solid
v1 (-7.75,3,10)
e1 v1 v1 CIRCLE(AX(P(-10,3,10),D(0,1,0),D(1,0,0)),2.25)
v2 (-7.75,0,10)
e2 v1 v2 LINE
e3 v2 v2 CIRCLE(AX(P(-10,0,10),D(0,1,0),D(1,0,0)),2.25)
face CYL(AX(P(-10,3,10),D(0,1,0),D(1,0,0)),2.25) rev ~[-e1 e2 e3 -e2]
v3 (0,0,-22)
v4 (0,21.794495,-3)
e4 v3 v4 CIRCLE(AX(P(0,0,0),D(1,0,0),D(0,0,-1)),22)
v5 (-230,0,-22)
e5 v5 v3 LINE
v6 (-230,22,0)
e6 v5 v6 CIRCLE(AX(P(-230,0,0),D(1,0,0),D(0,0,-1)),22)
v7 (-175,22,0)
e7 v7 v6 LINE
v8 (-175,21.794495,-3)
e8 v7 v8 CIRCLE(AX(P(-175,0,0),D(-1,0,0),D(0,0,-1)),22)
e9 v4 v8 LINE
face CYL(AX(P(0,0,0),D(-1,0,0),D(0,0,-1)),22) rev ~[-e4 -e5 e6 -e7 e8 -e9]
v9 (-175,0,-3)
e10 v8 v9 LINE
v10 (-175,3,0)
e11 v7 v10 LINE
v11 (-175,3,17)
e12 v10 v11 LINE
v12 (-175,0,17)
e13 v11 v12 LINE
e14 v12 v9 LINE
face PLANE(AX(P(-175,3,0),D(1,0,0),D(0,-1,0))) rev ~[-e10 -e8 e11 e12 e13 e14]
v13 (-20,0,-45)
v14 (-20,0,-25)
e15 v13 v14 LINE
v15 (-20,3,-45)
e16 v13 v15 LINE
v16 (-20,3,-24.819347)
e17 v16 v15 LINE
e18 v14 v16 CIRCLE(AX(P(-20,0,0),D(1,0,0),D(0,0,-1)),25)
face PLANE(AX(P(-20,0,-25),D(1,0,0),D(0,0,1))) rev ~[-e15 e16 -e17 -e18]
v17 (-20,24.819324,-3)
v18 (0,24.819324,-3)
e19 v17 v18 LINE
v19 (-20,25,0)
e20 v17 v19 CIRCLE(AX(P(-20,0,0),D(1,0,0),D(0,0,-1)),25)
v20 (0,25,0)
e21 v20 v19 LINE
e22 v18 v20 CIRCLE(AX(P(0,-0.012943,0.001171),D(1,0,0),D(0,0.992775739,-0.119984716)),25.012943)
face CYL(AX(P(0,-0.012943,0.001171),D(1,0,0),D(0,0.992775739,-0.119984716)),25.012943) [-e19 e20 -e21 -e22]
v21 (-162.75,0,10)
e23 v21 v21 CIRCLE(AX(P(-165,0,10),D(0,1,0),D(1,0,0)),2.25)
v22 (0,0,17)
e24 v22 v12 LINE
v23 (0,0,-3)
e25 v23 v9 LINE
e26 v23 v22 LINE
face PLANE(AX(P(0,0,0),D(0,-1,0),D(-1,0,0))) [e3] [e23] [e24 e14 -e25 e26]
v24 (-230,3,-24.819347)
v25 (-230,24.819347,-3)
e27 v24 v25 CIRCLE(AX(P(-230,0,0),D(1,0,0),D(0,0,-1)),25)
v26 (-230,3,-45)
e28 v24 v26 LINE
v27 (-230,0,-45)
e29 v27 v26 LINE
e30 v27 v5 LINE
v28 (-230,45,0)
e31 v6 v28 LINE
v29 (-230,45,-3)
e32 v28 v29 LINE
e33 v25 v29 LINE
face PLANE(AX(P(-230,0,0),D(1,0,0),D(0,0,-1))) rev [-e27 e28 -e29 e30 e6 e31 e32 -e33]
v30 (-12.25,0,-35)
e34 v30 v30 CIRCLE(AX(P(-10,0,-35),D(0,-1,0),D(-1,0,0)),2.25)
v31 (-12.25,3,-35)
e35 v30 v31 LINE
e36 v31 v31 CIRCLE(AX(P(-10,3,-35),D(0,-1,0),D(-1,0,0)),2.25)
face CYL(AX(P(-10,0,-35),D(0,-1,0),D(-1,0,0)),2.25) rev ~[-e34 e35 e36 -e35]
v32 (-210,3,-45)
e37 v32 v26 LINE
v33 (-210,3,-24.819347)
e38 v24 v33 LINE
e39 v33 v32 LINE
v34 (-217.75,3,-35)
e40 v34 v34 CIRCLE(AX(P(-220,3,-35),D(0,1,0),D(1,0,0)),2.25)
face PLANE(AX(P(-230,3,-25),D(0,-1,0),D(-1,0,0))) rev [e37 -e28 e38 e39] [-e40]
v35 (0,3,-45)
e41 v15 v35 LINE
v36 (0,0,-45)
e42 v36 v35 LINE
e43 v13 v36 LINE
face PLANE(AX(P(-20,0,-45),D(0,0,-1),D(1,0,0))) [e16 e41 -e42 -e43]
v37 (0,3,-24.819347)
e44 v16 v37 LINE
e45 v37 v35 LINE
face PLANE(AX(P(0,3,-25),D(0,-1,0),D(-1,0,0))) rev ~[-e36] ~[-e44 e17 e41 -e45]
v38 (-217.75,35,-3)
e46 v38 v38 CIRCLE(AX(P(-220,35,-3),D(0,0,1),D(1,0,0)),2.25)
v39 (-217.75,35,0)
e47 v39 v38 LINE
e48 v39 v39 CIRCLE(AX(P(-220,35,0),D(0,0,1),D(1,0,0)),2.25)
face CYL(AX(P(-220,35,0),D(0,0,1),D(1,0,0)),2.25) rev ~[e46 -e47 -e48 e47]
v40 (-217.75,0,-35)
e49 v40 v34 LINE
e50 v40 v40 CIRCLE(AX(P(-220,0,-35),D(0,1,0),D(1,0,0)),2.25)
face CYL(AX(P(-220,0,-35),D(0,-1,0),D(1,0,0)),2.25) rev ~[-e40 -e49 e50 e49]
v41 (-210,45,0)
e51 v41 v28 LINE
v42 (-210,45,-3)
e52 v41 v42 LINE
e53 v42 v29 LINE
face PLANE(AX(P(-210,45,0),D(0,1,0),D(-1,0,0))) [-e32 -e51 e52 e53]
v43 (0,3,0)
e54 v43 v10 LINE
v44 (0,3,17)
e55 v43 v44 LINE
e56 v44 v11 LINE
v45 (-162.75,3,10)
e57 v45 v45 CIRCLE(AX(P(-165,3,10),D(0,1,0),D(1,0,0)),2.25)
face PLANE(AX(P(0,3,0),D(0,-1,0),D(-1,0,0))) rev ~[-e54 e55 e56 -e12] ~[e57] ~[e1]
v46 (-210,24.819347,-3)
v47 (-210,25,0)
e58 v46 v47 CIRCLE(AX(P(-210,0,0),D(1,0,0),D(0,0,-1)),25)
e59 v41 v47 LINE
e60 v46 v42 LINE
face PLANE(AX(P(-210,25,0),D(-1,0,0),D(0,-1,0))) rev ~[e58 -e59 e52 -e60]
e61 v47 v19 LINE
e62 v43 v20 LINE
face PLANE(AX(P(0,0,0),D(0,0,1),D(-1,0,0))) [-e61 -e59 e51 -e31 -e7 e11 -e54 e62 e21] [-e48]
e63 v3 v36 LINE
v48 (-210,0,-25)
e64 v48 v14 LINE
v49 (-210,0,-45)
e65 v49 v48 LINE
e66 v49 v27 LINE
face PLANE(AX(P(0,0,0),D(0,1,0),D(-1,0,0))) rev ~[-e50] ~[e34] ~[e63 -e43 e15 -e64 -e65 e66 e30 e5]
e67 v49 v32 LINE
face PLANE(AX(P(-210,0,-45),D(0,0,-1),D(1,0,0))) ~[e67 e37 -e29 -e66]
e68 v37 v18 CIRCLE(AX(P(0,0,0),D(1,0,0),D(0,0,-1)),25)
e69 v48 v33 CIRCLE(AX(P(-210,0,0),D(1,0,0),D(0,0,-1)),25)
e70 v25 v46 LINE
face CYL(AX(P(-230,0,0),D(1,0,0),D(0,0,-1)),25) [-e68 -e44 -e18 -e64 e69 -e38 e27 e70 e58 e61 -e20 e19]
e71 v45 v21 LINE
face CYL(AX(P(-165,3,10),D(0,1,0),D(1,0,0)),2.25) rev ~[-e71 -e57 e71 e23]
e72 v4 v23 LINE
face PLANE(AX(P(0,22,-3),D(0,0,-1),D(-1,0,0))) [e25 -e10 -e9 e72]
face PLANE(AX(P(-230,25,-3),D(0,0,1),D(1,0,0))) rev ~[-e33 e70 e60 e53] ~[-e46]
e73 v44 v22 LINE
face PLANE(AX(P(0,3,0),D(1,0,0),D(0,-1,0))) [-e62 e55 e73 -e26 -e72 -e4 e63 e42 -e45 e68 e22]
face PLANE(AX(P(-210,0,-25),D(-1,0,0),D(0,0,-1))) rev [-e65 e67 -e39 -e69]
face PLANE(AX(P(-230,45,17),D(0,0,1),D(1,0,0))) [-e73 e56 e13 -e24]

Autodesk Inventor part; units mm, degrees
sketch "スケッチ1" plane through (0, 0, 0) normal (0, 1, 0) x (-1, 0, 0)
  line L0 (0, -22) -> (230, -22)
  line L1 (230, -22) -> (230, -25)
  line L2 (230, -25) -> (0, -25)
  line L3 (0, -25) -> (0, -22)
  line L4 (276, 0) -> (-46, 0) projected
  point P0 (0, 0)
  dimension "d0" = 3
  dimension "d1" = 230
  dimension "d2" = 25
revolve "回転1" add sketch "スケッチ1" angle 90 about axis through (-10, 0, 0) along (1, 0, 0)
sketch "スケッチ2" plane through (-230, 25, 0) normal (0, 0, 1) x (1, 0, 0)
  line L0 (230, 0) -> (0, 0) projected
  line L1 (0, 0) -> (0, -3) projected
  line L2 (0, -3) -> (230, -3) projected
  line L3 (230, -3) -> (230, 0) projected
  line L4 (230, 0) -> (0, 0) projected
  line L5 (0, 0) -> (20, 0)
  line L6 (20, 0) -> (20, 20)
  line L7 (20, 20) -> (0, 20)
  line L8 (0, 20) -> (0, 0)
  line L9 (115, 0) -> (115, -3)
  line L10 (0, -3) -> (230, -3) projected
  line L11 (20, 0) -> (20, -3)
  circle A0 centre (10, 10) radius 2.25
  point P0 (230, -25)
  point P1 (20, 0)
  point P2 (20, -3)
  point P3 (20, 0)
  dimension "d4" = 20
  dimension "d5" = 20
  dimension "d8" = 4.5
extrude "押し出し1" add sketch "スケッチ2" against normal blind 3 contours L11 L2 L1 L0 | L0 L8 L7 L6
ref_plane "作業平面1" through (-115, 0, -25) normal (-1, 0, 0) x (0, 0, 1)
mirror "ミラー1" about plane through (-115, 0, -25) normal (-1, 0, 0) of "押し出し1"
ref_plane "作業平面2" through (-230, 0, 0) normal (0, 0.7071068, 0.7071068) x (-1, 0, 0)
mirror "ミラー2" about plane through (-230, 0, 0) normal (0, 0.7071068, 0.7071068) of "ミラー1", "押し出し1"
ref_plane "作業平面3" through (-20, 22, 0) normal (0, 1, 0) x (1, 0, 0)
sketch "スケッチ4" plane through (-20, 22, 0) normal (0, 1, 0) x (1, 0, 0)
  line L0 (0, 0) -> (20, 0) projected
  line L1 (20, 0) -> (20, 3) projected
  line L2 (20, 3) -> (0, 3) projected
  line L3 (0, 0) -> (0, 3) projected
  line L4 (20, 0) -> (0, 0)
  line L5 (0, 0) -> (-155, 0)
  line L6 (-155, 0) -> (-155, 3)
  line L7 (-155, 3) -> (0, 3)
  line L8 (0, 3) -> (0, 0)
  line L9 (-210, 0) -> (-210, 22) projected
  dimension "d22" = 55
extrude "押し出し3" add sketch "スケッチ4" against normal up to surface (22 mm away)
sketch "スケッチ5" plane through (-230, 45, 0) normal (0, 0, 1) x (1, 0, 0)
  line L0 (230, -45) -> (55, -45) projected
  line L1 (230, -42) -> (210, -42) projected
  line L2 (230, 0) -> (230, -45) projected
  line L3 (210, -42) -> (55, -42)
  line L4 (55, -23.2055) -> (55, -45) projected
  line L5 (55, -23) -> (55, -45) projected
extrude "押し出し4" add sketch "スケッチ5" along normal blind 17
sketch "スケッチ7" plane through (-175, 3, 0) normal (0, 1, 0) x (1, 0, 0)
  circle A0 centre (165, 35) radius 2.25 projected
  circle A1 centre (165, -10) radius 2.25
  line L0 (0, 0) -> (175, 0) projected
  line L1 (175, 0) -> (175, -17) projected
  circle A2 centre (10, -10) radius 2.25
  line L2 (0, 0) -> (0, -17) projected
  dimension "d23" = 4.5
  dimension "d24" = 10
  dimension "d25" = 10
  dimension "d26" = 4.5
  dimension "d27" = 10
  dimension "d28" = 10
extrude "押し出し6" cut sketch "スケッチ7" against normal up to surface (3 mm away) contours A1 | A2
sketch "スケッチ8" plane through (0, 24.8193, -3) normal (1, 0, 0) x (0, 0, -1)
  arc A0 (19, -24.8193) -> (0, -3.0249) centre (-3, -24.8193) ccw projected
  line L0 (19, -24.8193) -> (42, -24.8193) projected
  line L1 (42, -24.8193) -> (42, -21.8193) projected
  line L2 (21.8193, -21.8193) -> (42, -21.8193) projected
  arc A1 (21.8193, -21.8193) -> (0, 0) centre (-3, -24.8193) ccw projected
  line L3 (0, 0) -> (0, 20.1807) projected
  line L4 (-3, 20.1807) -> (0, 20.1807) projected
  line L5 (-3, 20.1807) -> (-3, -21.8193) projected
  line L6 (-3, -21.8193) -> (-20, -21.8193) projected
  line L7 (-20, -24.8193) -> (-20, -21.8193) projected
  line L8 (0, -24.8193) -> (-20, -24.8193) projected
  line L9 (0, -3.0249) -> (0, -24.8193) projected
  line L10 (-3, 20.1807) -> (-3, -21.8193) projected
  arc A2 (0, 0) -> (-3, 0.1807) centre (-3, -24.8193) ccw
  point P0 (-3, -24.8193)
  point P1 (-3, 0.1807)
extrude "押し出し7" cut sketch "スケッチ8" against normal up to surface (20 mm away) contours A2 L5 L4 L3
properties part number "CableCoverForFrameHigher"
